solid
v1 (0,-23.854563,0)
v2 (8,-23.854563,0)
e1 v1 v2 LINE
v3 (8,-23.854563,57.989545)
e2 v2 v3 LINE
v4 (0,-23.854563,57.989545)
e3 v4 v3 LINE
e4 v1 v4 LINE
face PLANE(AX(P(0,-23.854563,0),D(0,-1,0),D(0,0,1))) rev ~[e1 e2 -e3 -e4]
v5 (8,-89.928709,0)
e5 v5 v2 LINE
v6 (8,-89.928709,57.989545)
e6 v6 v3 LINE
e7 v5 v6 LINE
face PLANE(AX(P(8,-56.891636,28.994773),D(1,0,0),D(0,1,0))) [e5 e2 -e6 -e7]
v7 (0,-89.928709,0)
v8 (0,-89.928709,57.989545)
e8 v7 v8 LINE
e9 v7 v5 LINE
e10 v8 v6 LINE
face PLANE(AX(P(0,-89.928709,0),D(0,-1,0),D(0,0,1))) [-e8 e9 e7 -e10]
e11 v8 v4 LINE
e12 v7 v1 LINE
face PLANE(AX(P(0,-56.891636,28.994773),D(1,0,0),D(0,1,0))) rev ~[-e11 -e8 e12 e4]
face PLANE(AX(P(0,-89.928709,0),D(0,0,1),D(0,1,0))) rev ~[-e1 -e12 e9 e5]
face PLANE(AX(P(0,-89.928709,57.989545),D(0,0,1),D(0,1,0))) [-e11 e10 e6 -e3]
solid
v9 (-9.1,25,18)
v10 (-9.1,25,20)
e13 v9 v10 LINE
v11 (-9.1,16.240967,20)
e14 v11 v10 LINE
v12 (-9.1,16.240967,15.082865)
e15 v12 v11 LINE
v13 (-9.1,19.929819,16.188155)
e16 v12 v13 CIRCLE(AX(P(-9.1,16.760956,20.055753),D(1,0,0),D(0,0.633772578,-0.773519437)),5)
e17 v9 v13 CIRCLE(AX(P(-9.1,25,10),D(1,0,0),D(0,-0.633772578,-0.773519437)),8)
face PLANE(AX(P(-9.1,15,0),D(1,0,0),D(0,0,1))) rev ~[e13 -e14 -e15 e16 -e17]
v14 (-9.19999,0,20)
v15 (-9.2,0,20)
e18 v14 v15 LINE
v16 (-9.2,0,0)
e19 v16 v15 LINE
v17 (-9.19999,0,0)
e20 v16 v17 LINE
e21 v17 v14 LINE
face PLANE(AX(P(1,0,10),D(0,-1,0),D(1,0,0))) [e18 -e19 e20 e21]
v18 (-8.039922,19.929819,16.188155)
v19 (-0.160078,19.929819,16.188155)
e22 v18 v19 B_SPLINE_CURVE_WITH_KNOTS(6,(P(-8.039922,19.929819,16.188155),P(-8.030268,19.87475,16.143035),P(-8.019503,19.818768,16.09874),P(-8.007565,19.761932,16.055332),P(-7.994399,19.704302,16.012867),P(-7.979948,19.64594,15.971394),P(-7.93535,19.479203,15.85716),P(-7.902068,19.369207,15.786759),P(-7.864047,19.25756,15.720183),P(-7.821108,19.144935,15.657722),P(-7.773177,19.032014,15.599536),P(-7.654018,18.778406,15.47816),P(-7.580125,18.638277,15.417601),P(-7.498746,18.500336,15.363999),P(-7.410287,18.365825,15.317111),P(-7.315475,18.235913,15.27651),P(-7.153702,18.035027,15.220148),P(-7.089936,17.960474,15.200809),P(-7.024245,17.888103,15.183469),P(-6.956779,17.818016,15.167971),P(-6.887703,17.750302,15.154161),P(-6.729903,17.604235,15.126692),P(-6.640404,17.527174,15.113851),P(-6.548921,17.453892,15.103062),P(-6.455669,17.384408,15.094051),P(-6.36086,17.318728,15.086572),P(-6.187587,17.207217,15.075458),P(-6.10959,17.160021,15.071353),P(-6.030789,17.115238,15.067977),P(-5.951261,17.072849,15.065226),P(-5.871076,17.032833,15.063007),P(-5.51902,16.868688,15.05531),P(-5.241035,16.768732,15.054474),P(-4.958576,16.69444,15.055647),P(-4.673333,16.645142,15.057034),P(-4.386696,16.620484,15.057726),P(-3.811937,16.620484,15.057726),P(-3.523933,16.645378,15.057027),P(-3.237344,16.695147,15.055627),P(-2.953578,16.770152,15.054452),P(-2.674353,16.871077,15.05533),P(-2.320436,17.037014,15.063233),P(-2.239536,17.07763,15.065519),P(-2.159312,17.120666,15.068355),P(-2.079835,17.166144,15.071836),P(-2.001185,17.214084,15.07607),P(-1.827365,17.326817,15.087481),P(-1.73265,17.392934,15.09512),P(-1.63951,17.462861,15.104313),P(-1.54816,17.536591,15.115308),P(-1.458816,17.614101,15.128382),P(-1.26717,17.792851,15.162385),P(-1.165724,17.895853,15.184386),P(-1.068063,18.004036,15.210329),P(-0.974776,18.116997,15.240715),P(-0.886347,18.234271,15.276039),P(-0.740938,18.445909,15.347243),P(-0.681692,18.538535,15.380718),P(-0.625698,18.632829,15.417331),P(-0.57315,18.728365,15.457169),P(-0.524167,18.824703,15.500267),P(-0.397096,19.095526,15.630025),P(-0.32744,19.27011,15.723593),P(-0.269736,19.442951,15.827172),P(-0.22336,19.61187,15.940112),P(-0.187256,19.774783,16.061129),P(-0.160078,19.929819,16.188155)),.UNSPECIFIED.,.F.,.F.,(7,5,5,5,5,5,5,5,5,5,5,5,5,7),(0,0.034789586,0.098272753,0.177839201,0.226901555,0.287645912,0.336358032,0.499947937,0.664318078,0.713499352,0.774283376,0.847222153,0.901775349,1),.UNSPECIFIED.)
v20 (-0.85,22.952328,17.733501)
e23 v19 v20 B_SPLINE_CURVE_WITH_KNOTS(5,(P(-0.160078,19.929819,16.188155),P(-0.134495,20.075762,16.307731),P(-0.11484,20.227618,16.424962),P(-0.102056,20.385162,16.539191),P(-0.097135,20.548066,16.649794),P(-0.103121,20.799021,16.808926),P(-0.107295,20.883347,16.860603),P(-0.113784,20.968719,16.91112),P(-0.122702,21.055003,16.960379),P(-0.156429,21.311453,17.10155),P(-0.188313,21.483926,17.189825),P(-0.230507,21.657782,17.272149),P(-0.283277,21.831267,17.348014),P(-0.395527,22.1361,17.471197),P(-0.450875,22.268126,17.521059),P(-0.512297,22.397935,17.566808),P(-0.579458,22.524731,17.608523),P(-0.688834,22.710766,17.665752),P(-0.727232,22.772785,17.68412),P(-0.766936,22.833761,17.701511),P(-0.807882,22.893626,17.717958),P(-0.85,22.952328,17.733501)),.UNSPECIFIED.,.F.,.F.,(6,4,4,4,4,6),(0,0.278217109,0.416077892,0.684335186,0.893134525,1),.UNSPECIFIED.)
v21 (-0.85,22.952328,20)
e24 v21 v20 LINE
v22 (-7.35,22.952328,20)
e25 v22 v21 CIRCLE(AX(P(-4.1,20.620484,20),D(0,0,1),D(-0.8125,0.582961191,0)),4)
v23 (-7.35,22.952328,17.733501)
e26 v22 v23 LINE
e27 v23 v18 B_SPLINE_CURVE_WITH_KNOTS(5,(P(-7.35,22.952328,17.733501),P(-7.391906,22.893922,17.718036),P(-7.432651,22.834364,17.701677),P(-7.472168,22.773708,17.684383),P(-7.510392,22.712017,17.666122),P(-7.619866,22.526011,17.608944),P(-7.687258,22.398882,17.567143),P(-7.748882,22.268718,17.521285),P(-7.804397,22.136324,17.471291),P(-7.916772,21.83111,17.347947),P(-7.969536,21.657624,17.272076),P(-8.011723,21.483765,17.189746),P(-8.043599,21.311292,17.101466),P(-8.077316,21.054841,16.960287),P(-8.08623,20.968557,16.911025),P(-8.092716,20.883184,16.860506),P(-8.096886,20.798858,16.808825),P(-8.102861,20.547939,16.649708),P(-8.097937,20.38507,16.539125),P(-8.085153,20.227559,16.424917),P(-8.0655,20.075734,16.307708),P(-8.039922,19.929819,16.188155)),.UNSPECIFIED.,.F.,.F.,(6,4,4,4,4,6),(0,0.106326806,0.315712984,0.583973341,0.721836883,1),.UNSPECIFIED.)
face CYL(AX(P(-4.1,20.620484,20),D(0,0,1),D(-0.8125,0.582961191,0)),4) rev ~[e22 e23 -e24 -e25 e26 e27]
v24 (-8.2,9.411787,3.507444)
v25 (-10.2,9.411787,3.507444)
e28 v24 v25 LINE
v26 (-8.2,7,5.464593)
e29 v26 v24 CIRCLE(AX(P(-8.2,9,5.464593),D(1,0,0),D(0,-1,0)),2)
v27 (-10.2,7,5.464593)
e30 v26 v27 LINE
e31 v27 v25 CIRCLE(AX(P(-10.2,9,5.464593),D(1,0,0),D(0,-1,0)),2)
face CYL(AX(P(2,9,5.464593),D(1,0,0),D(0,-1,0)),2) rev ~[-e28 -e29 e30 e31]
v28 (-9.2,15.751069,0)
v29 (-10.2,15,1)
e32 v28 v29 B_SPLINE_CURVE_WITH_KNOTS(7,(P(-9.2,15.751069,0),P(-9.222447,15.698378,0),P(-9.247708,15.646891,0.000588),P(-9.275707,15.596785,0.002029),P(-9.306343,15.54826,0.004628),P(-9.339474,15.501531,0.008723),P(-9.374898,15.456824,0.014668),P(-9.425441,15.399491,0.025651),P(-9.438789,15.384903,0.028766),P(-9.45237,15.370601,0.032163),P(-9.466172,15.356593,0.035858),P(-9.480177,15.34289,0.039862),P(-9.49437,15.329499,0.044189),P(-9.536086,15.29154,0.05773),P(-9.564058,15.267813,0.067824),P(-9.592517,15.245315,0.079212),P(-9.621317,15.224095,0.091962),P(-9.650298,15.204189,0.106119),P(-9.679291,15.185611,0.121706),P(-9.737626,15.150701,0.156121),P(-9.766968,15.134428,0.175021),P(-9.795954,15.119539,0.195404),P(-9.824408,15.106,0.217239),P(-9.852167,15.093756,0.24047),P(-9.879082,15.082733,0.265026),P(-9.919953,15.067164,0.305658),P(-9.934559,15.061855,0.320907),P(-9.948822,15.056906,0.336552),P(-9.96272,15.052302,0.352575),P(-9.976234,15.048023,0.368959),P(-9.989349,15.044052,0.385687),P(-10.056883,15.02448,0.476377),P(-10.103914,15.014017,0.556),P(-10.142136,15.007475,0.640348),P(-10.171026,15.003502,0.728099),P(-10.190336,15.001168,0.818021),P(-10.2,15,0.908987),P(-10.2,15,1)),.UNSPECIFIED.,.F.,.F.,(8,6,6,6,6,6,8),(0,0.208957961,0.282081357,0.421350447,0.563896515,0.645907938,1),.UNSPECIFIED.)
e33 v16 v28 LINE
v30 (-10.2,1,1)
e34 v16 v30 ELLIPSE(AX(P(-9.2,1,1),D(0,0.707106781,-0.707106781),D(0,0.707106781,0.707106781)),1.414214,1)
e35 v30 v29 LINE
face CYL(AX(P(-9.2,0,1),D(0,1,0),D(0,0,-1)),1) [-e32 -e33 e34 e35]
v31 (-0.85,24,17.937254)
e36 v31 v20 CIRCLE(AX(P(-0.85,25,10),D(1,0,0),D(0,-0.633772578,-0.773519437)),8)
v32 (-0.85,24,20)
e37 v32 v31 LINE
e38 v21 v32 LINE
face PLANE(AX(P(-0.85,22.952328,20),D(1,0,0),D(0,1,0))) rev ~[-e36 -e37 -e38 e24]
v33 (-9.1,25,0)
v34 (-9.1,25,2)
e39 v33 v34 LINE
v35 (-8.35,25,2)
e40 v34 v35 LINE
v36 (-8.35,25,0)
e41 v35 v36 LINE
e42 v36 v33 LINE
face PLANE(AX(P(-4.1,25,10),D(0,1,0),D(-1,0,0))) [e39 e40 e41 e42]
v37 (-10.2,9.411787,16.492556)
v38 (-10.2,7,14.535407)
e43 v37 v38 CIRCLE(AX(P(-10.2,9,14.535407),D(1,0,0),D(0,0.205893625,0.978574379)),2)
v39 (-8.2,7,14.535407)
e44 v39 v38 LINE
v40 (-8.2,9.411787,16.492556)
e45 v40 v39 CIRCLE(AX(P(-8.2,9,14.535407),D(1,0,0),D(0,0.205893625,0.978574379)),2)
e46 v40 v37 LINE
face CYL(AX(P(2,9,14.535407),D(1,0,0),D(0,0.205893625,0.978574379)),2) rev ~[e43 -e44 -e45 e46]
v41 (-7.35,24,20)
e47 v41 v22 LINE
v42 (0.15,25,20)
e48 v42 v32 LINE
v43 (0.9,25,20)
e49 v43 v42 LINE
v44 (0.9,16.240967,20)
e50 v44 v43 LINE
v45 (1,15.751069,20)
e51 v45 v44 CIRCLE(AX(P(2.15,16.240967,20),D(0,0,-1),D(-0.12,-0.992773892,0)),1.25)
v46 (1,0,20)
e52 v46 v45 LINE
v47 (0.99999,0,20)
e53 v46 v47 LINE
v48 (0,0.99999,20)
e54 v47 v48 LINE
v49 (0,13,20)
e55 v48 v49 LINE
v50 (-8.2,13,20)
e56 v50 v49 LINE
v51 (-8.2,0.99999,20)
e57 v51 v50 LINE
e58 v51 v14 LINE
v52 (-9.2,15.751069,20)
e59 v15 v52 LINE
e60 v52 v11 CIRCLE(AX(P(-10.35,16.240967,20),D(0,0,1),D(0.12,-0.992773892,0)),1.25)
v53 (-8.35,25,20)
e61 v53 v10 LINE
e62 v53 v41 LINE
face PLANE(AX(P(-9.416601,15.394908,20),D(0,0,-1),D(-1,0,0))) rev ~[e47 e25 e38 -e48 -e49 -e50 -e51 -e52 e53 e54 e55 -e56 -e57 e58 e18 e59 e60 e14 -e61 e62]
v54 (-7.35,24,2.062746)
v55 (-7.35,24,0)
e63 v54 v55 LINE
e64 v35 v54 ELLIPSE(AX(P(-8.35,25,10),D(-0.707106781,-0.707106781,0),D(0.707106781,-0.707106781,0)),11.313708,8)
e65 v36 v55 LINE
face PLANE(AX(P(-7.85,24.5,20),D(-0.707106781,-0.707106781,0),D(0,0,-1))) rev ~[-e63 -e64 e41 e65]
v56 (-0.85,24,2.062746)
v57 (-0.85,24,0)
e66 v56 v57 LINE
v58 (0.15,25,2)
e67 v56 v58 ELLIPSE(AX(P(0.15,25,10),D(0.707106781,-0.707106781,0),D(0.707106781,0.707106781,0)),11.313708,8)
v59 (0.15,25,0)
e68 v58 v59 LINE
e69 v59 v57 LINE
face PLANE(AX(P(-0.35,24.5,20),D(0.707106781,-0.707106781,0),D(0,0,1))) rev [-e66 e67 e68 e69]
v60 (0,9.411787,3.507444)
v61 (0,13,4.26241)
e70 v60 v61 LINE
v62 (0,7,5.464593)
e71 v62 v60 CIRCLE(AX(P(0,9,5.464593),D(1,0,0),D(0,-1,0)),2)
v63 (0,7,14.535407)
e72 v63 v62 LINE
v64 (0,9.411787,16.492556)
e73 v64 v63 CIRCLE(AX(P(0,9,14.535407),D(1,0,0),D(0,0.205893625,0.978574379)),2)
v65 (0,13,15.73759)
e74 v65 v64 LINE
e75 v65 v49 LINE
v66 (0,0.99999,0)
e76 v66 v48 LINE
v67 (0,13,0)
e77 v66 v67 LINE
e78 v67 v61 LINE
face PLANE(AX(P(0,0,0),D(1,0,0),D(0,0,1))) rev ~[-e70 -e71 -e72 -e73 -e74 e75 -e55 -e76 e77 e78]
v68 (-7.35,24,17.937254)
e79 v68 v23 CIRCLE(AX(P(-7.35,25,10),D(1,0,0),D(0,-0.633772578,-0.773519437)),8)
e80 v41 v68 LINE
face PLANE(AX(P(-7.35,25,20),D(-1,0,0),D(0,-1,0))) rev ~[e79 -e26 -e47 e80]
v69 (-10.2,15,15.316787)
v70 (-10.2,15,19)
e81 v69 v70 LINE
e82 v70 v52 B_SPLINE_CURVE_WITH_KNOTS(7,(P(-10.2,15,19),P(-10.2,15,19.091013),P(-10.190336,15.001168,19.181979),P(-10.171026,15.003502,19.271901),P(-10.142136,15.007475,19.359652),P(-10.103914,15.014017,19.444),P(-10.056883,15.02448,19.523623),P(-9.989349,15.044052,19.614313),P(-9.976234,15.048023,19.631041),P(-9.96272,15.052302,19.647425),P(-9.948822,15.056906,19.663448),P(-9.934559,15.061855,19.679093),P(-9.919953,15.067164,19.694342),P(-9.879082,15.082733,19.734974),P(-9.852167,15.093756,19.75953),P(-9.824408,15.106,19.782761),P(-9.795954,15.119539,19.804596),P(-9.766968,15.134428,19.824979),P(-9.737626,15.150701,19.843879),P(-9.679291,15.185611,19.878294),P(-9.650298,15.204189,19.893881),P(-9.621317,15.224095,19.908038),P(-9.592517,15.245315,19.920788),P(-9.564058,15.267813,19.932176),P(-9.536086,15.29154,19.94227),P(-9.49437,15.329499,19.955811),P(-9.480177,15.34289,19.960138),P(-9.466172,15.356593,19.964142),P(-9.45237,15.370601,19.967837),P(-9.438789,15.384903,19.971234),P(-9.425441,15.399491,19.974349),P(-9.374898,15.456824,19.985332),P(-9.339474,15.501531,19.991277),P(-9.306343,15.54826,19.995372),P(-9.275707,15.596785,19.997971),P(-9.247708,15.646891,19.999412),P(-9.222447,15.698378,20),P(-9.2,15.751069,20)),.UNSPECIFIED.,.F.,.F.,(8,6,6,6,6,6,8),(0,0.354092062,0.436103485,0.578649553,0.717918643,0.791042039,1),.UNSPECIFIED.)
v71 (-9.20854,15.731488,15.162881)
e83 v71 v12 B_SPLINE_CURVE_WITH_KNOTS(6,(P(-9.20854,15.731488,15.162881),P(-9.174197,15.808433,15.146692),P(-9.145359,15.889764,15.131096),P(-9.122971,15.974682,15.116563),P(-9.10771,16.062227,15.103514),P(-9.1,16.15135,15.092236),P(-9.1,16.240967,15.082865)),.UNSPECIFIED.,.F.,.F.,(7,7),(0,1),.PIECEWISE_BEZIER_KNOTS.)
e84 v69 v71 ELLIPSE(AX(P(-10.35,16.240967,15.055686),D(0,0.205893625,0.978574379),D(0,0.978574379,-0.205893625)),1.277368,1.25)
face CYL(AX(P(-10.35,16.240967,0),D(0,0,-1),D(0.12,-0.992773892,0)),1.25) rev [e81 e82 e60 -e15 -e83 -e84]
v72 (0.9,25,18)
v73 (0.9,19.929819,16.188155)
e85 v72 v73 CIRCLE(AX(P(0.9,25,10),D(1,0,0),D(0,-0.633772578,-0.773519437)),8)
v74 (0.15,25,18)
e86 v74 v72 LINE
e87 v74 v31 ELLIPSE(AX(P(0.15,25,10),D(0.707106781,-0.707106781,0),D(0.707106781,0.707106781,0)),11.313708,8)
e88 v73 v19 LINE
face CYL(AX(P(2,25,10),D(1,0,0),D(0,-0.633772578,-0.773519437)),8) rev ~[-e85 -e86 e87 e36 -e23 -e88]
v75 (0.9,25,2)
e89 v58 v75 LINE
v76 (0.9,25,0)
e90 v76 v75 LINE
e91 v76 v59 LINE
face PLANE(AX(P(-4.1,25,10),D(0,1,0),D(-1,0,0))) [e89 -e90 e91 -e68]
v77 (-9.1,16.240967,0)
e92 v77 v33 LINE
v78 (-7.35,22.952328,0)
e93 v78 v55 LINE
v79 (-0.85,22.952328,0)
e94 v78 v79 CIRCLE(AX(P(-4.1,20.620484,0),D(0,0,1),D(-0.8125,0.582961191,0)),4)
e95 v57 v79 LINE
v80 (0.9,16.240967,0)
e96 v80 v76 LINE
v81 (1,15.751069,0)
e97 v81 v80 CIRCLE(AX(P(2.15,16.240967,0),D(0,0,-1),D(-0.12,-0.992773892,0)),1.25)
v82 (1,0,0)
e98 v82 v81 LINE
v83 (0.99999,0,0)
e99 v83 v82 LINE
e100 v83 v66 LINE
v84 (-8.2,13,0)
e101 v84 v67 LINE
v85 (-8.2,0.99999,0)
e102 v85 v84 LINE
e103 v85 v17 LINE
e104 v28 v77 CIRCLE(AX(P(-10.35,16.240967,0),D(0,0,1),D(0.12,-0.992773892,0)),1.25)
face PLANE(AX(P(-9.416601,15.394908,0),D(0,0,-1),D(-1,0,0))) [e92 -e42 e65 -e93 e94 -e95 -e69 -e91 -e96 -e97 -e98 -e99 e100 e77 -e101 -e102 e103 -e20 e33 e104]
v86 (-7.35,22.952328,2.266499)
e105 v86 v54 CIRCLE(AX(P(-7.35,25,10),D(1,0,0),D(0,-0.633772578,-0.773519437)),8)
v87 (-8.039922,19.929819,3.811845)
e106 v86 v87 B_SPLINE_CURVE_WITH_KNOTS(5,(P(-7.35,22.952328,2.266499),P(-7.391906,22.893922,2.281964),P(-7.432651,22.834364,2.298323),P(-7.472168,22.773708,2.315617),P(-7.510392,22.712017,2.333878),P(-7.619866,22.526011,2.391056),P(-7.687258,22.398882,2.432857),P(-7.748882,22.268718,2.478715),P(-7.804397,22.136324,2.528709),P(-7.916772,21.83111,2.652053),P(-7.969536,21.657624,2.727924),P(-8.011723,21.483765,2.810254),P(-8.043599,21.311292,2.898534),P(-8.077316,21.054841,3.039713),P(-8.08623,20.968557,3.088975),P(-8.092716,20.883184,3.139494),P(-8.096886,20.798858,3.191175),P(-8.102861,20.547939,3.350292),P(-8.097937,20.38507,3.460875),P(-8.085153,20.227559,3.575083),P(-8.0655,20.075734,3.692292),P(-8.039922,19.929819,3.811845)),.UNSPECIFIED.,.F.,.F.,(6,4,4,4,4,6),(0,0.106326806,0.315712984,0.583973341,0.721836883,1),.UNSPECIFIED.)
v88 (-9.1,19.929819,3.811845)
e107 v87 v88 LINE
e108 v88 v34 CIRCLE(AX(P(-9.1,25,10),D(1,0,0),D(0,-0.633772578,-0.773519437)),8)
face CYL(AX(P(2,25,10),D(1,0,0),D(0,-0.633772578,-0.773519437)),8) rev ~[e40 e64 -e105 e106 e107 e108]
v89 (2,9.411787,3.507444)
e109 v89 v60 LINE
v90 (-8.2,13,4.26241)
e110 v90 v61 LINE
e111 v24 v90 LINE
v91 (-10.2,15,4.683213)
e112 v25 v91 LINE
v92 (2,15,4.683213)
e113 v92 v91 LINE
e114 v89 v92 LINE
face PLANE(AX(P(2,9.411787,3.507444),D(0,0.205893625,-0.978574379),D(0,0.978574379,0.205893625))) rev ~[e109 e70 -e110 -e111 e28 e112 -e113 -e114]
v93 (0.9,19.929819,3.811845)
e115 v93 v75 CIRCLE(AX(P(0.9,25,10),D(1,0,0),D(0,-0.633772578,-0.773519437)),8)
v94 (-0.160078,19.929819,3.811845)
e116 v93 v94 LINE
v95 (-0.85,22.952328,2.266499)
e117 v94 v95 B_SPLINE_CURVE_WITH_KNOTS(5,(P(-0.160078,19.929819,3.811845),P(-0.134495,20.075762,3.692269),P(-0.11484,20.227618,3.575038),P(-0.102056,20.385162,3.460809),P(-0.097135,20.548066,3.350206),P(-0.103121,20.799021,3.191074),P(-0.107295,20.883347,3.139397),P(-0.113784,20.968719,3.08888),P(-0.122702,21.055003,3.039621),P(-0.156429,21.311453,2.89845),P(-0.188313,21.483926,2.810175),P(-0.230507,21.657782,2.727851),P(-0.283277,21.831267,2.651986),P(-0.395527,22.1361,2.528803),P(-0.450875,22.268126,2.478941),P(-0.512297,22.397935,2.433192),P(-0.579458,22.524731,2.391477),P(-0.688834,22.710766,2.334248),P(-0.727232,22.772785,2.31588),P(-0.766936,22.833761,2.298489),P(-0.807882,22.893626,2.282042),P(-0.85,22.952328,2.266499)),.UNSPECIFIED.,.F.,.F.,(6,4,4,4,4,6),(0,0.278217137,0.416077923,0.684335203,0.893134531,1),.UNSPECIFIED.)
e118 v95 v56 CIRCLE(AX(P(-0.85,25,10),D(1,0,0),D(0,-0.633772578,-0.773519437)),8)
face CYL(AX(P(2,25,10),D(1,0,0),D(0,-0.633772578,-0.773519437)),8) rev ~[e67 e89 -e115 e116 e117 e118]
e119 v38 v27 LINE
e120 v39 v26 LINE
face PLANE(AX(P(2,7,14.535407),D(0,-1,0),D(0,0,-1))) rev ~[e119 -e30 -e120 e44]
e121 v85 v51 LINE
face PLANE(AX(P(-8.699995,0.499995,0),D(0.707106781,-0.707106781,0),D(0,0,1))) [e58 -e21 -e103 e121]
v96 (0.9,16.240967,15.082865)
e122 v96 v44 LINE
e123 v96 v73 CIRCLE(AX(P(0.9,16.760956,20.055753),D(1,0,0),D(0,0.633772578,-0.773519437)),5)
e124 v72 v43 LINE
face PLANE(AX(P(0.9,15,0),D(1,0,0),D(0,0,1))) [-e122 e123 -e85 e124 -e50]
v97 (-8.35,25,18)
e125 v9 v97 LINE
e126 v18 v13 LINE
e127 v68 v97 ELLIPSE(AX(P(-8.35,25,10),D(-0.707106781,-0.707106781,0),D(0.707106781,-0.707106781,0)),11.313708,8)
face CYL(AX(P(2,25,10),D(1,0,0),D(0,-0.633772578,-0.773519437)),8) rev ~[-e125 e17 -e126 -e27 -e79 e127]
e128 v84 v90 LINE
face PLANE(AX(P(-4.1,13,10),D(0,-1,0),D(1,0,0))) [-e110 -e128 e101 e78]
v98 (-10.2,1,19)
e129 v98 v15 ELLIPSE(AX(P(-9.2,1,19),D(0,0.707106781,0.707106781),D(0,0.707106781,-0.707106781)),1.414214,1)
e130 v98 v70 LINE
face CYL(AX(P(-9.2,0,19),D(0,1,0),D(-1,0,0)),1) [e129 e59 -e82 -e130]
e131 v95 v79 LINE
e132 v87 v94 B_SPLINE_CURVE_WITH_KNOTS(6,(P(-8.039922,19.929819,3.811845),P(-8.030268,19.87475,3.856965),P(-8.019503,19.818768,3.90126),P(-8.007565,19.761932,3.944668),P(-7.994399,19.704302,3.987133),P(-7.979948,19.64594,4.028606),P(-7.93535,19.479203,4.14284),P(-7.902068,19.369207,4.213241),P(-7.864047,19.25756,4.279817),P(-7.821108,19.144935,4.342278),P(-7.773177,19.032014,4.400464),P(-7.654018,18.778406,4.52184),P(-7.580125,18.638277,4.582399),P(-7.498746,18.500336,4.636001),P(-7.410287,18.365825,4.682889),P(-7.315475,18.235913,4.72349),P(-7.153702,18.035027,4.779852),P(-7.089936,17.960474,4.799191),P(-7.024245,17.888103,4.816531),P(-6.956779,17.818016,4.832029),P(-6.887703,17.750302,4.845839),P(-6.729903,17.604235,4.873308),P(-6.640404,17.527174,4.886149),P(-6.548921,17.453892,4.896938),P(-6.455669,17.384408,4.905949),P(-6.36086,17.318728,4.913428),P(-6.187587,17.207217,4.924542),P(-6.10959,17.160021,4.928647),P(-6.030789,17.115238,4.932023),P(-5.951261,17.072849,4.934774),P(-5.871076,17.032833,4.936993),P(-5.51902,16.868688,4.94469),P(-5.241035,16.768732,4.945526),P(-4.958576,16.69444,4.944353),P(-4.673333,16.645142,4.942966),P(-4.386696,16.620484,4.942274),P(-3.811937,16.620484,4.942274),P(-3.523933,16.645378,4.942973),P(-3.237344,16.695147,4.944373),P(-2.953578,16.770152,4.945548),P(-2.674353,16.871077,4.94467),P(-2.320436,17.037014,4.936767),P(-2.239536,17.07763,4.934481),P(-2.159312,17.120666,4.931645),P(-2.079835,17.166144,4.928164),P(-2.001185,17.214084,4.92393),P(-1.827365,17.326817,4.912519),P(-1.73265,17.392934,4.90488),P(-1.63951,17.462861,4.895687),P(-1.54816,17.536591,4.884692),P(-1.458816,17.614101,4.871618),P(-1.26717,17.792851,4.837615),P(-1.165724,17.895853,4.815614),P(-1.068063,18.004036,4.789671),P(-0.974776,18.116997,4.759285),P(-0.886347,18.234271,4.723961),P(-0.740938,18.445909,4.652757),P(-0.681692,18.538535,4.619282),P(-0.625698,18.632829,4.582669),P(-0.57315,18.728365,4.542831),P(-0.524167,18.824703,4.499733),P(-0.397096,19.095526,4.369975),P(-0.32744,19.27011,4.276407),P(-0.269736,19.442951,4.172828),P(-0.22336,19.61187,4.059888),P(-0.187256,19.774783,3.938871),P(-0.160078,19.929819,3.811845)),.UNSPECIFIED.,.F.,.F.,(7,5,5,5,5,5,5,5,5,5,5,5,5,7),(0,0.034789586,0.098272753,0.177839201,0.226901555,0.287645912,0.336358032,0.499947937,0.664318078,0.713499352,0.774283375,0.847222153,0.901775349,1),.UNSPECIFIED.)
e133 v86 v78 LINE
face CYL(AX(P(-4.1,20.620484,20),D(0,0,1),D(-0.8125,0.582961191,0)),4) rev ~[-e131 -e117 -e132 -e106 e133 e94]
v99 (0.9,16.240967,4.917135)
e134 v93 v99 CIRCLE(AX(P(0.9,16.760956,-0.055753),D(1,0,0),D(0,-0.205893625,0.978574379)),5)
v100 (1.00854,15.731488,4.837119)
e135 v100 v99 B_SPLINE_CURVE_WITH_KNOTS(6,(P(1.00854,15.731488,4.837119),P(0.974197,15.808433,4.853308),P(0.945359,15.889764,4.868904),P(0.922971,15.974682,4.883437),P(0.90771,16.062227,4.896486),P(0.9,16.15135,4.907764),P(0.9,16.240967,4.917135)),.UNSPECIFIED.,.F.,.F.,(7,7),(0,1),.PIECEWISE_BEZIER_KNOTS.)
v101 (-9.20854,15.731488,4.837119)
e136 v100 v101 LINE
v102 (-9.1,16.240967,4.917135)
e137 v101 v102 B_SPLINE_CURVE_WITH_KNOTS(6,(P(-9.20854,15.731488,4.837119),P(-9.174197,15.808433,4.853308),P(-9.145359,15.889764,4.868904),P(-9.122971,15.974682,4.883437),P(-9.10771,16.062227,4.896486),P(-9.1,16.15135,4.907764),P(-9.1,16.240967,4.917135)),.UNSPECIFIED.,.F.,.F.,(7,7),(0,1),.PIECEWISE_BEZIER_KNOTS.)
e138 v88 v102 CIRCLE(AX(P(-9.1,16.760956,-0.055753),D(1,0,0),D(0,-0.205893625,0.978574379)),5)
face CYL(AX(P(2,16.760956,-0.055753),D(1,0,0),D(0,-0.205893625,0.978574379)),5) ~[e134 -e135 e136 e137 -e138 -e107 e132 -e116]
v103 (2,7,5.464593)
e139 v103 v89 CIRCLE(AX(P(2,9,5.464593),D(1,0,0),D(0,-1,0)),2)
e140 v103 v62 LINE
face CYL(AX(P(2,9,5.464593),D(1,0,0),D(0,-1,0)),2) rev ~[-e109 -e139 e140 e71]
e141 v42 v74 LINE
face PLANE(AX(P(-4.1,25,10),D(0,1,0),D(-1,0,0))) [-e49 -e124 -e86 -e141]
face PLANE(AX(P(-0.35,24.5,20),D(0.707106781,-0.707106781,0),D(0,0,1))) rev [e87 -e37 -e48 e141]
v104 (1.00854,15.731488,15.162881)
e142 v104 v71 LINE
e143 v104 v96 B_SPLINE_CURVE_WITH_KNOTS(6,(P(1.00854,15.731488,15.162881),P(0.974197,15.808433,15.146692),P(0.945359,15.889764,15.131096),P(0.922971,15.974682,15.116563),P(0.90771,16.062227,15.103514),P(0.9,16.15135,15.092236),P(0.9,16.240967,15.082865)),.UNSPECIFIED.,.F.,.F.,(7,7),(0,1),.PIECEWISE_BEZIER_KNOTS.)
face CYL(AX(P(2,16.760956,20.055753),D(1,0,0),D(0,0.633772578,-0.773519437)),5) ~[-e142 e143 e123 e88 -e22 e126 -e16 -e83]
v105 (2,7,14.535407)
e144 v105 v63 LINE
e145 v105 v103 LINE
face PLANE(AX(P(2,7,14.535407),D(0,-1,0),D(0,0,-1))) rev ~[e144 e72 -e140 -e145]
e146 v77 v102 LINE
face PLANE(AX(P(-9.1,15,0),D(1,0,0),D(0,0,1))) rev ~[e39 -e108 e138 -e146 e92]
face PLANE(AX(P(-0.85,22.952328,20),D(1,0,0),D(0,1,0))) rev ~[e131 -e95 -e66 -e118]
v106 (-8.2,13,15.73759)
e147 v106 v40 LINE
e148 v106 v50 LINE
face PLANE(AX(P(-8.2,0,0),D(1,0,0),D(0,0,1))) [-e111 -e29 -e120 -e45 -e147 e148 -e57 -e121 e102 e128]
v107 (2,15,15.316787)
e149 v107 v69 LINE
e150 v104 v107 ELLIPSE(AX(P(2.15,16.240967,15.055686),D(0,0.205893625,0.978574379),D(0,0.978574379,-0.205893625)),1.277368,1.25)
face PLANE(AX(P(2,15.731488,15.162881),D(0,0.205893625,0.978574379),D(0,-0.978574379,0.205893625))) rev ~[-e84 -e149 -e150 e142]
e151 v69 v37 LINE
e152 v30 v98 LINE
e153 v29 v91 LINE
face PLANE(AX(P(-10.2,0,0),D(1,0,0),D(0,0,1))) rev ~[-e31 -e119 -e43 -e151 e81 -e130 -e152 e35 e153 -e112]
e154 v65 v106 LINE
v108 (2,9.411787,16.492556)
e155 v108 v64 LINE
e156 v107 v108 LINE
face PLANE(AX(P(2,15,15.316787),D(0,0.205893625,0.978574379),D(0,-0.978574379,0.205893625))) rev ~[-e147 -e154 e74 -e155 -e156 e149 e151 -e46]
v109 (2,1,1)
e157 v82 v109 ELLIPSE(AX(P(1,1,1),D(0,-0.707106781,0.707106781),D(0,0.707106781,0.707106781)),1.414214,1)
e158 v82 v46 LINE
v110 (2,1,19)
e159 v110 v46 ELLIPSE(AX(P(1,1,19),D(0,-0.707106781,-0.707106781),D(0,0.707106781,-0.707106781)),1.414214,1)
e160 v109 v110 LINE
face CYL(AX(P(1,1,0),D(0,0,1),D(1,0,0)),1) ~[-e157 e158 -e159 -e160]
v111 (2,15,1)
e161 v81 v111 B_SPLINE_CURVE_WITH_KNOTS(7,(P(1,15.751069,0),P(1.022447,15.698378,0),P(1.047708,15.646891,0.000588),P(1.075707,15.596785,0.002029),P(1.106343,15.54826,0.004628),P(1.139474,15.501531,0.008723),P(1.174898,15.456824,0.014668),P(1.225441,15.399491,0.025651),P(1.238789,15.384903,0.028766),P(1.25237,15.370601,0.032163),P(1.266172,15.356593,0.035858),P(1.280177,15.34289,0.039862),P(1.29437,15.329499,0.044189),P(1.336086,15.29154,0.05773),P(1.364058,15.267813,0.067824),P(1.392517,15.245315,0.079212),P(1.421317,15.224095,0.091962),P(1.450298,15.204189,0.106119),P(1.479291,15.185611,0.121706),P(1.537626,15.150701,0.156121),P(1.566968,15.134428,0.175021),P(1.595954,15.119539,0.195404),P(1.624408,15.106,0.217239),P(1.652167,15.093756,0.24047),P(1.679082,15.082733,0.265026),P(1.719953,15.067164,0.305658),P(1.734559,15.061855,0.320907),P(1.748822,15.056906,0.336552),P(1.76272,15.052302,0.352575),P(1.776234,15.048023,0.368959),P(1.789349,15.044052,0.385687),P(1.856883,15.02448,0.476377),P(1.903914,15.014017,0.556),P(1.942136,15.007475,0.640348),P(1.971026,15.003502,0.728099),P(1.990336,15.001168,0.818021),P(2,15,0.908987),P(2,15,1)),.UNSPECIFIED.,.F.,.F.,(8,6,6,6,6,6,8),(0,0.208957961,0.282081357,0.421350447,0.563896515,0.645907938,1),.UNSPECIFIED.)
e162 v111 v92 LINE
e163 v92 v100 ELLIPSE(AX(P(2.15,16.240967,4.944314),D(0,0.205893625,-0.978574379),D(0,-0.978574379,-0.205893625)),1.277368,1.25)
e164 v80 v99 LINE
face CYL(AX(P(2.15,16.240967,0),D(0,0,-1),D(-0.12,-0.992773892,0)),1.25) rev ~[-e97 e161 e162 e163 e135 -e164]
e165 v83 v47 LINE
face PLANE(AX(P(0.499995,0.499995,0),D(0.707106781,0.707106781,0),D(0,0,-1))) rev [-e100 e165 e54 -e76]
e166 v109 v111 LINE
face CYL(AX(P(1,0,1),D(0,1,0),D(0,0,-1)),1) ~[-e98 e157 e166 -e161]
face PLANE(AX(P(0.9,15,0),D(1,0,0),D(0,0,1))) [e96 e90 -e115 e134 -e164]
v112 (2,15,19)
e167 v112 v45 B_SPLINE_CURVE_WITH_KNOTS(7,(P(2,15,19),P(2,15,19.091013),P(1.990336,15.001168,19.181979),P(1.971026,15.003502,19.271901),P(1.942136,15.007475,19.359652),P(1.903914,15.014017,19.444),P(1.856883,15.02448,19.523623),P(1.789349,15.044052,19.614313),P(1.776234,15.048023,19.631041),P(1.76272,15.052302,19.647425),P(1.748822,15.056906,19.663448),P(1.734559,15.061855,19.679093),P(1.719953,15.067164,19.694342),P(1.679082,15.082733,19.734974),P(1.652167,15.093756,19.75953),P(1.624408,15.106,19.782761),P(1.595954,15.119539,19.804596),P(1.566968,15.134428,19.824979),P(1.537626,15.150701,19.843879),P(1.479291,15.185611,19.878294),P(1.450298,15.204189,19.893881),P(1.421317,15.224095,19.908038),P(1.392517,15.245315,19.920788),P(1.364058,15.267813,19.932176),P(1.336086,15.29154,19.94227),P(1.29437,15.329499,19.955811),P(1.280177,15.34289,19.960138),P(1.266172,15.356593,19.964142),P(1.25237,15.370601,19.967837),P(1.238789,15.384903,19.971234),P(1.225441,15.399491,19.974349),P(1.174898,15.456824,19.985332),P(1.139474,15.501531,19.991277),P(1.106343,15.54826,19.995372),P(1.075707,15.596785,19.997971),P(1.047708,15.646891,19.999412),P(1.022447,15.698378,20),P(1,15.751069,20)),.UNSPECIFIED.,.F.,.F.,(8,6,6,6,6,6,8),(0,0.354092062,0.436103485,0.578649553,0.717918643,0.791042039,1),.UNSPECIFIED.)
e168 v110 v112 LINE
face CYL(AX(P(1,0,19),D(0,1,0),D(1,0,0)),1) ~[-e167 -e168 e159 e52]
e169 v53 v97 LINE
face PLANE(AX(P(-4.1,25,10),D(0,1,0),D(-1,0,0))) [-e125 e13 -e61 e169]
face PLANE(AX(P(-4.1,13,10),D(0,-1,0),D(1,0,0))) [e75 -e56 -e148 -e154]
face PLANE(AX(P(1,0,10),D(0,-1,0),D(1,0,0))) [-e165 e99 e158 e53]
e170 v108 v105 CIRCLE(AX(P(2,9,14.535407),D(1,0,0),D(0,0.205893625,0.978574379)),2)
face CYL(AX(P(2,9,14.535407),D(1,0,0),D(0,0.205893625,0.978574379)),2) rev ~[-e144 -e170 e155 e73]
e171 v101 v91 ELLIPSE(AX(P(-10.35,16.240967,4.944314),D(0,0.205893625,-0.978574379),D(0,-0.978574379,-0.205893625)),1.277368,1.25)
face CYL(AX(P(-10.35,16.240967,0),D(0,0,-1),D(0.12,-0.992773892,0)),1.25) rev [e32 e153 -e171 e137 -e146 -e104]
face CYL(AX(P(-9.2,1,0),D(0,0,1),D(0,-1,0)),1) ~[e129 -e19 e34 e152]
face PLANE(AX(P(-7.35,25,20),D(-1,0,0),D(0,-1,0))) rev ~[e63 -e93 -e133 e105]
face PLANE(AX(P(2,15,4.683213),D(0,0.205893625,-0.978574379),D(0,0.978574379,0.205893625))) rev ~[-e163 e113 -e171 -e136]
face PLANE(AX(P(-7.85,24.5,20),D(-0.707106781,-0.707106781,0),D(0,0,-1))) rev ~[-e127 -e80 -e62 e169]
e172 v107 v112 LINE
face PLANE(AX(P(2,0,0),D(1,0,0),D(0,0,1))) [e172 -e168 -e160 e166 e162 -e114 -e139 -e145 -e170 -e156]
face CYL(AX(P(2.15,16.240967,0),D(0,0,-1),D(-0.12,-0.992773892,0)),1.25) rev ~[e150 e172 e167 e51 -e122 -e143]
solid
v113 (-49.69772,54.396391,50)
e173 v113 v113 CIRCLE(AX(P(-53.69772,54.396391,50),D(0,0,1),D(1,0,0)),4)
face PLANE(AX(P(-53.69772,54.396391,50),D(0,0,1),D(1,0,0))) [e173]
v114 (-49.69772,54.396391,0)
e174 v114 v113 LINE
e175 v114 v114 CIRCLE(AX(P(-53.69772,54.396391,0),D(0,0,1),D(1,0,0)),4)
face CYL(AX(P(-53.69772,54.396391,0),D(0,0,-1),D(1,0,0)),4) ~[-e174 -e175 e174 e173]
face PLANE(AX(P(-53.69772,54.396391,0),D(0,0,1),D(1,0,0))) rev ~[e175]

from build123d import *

# Parameters (mm, degrees)
F0_W        = 2
F0_H        = 20
F0_W_2      = 8.2
F1_DEPTH    = 15
F2_DEPTH    = 13
F3_W        = 10
F3_H        = 20
F4_DEPTH    = 10
F5_T1_DEPTH = 20
F7_DEPTH    = 20.001
F8_SIZE     = 1
F9_R        = 1
F10_SIZE    = 0.99999
F11_R       = 4
F12_DEPTH   = 50
F13_W       = 66.0741459578
F13_H       = 57.9895451665
F14_DEPTH   = 8
F16_DEPTH   = 25


# Not quite as in the source:
# - a fillet or chamfer that OpenCascade refuses, or shapes differently, is made with other operations: its cross-section is extruded or revolved along the edge and cut away or added
# - a fillet or chamfer is up to 0.001 mm smaller than in the source, because OpenCascade refuses the exact size
# - a feature names something its author has since deleted; it is built from what else it names


with BuildPart() as f1:
    # F0 (on Front) → F1 (new body)
    with BuildSketch(Plane.XZ):
        with Locations((1, 10)):
            Rectangle(F0_W, F0_H)
        with Locations((-9.2, 10)):
            Rectangle(F0_W, F0_H)
        with Locations((-4.1, 10)):
            Rectangle(F0_W_2, F0_H)
    extrude(amount=-F1_DEPTH)

    # F0 (on Front) → F2 (cut)
    with BuildSketch(Plane.XZ):
        with Locations((-4.1, 10)):
            Rectangle(F0_W_2, F0_H)
    extrude(amount=-F2_DEPTH, mode=Mode.SUBTRACT)

    # F3 (on face) → F4 (join)
    with BuildSketch(Plane(origin=(0, 15, 0), x_dir=(-1, 0, 0), z_dir=(0, 1, 0))):
        with Locations((4.1, 10)):
            Rectangle(F3_W, F3_H)
    extrude(amount=F4_DEPTH)

    # F5: fillet of radius 1.25 on 2 edges, made by hand

    # F5_s2 → F5_t1 (join)
    with BuildSketch(Plane.XY):
        with BuildLine():
            ThreePointArc((-10.2, 15), (-9.4145856533, 15.411811167), (-9.1, 16.2409673646))
            Line((-9.1, 16.2409673646), (-9.075, 16.2409673646))
            Line((-9.075, 16.2409673646), (-9.075, 15))
            Line((-9.075, 15), (-9.1, 14.975))
            ThreePointArc((-9.1, 14.975), (-9.65, 14.975), (-10.197, 14.9751806527))
            Line((-10.197, 14.9751806527), (-10.2, 15))
        make_face()
        with BuildLine():
            ThreePointArc((2, 15), (1.2145856533, 15.411811167), (0.9, 16.2409673646))
            Line((0.9, 16.2409673646), (0.875, 16.2409673646))
            Line((0.875, 16.2409673646), (0.875, 15))
            Line((0.875, 15), (0.9, 14.975))
            ThreePointArc((0.9, 14.975), (1.45, 14.975), (1.997, 14.9751806527))
            Line((1.997, 14.9751806527), (2, 15))
        make_face()
    extrude(amount=F5_T1_DEPTH)

    # F6 (on face) → F7 (cut, through all)
    with BuildSketch(Plane.XY.offset(20)):
        with BuildLine():
            Line((-7.35, 25), (-7.35, 22.9523284456))
            ThreePointArc((-7.35, 22.9523284456), (-4.1, 16.6204836823), (-0.85, 22.9523284456))
            Line((-0.85, 22.9523284456), (-0.85, 25))
            Line((-0.85, 25), (-7.35, 25))
        make_face()
    extrude(amount=-F7_DEPTH, mode=Mode.SUBTRACT)

    # F8
    f8_edges = [f1.edges().sort_by_distance(p)[0] for p in [
        (-0.85, 25, 10),
        (-7.35, 25, 10),
    ]]
    chamfer(f8_edges, length=F8_SIZE)

    # F9
    f9_edges = [f1.edges().sort_by_distance(p)[0] for p in [
        (-10.2, 7.5, 20),
        (-10.2, 7.5, 0),
        (-10.2, 0, 10),
        (2, 7.5, 20),
        (2, 7.5, 0),
        (2, 0, 10),
    ]]
    fillet(f9_edges, radius=F9_R)

    # F10 (size 1 in the source; OpenCascade refuses exactly that, so slightly less here)
    f10_edges = [f1.edges().sort_by_distance(p)[0] for p in [
        (0, 0, 10),
        (-8.2, 0, 10),
    ]]
    chamfer(f10_edges, length=F10_SIZE)

    # F15 (on face) → F16 (cut)
    with BuildSketch(Plane.YZ.offset(2)):
        with BuildLine():
            Line((15, 15.3167871196), (9.4117872498, 16.4925560795))
            ThreePointArc((9.4117872498, 16.4925560795), (7.7397568686, 16.0884003189), (7, 14.5354073216))
            Line((7, 14.5354073216), (7, 5.4645926784))
            ThreePointArc((7, 5.4645926784), (7.7397568686, 3.9115996811), (9.4117872498, 3.5074439205))
            Line((9.4117872498, 3.5074439205), (15, 4.6832128804))
            Line((15, 4.6832128804), (15, 15.3167871196))
        make_face()
        with BuildLine():
            Line((15.7314883663, 15.1628807896), (15, 15.3167871196))
            Line((15, 15.3167871196), (15, 4.6832128804))
            Line((15, 4.6832128804), (15.7314883663, 4.8371192104))
            ThreePointArc((15.7314883663, 4.8371192104), (17.9471476835, 4.8015048188), (19.9298193789, 3.8118445018))
            ThreePointArc((19.9298193789, 3.8118445018), (33, 10), (19.9298193789, 16.1881554982))
            ThreePointArc((19.9298193789, 16.1881554982), (17.9471476835, 15.1984951812), (15.7314883663, 15.1628807896))
        make_face()
    extrude(amount=-F16_DEPTH, mode=Mode.SUBTRACT)


with BuildPart() as f12:
    # F11 (on Top) → F12 (new body)
    with BuildSketch(Plane.XY):
        with Locations((-53.69772017, 54.3963909149)):
            Circle(F11_R)
    extrude(amount=F12_DEPTH)


with BuildPart() as f14:
    # F13 (on Right) → F14 (new body)
    with BuildSketch(Plane.YZ):
        with Locations((-56.8916359916, 28.9947725832)):
            Rectangle(F13_W, F13_H)
    extrude(amount=F14_DEPTH)


solid = Compound([f1.part, f12.part, f14.part])
